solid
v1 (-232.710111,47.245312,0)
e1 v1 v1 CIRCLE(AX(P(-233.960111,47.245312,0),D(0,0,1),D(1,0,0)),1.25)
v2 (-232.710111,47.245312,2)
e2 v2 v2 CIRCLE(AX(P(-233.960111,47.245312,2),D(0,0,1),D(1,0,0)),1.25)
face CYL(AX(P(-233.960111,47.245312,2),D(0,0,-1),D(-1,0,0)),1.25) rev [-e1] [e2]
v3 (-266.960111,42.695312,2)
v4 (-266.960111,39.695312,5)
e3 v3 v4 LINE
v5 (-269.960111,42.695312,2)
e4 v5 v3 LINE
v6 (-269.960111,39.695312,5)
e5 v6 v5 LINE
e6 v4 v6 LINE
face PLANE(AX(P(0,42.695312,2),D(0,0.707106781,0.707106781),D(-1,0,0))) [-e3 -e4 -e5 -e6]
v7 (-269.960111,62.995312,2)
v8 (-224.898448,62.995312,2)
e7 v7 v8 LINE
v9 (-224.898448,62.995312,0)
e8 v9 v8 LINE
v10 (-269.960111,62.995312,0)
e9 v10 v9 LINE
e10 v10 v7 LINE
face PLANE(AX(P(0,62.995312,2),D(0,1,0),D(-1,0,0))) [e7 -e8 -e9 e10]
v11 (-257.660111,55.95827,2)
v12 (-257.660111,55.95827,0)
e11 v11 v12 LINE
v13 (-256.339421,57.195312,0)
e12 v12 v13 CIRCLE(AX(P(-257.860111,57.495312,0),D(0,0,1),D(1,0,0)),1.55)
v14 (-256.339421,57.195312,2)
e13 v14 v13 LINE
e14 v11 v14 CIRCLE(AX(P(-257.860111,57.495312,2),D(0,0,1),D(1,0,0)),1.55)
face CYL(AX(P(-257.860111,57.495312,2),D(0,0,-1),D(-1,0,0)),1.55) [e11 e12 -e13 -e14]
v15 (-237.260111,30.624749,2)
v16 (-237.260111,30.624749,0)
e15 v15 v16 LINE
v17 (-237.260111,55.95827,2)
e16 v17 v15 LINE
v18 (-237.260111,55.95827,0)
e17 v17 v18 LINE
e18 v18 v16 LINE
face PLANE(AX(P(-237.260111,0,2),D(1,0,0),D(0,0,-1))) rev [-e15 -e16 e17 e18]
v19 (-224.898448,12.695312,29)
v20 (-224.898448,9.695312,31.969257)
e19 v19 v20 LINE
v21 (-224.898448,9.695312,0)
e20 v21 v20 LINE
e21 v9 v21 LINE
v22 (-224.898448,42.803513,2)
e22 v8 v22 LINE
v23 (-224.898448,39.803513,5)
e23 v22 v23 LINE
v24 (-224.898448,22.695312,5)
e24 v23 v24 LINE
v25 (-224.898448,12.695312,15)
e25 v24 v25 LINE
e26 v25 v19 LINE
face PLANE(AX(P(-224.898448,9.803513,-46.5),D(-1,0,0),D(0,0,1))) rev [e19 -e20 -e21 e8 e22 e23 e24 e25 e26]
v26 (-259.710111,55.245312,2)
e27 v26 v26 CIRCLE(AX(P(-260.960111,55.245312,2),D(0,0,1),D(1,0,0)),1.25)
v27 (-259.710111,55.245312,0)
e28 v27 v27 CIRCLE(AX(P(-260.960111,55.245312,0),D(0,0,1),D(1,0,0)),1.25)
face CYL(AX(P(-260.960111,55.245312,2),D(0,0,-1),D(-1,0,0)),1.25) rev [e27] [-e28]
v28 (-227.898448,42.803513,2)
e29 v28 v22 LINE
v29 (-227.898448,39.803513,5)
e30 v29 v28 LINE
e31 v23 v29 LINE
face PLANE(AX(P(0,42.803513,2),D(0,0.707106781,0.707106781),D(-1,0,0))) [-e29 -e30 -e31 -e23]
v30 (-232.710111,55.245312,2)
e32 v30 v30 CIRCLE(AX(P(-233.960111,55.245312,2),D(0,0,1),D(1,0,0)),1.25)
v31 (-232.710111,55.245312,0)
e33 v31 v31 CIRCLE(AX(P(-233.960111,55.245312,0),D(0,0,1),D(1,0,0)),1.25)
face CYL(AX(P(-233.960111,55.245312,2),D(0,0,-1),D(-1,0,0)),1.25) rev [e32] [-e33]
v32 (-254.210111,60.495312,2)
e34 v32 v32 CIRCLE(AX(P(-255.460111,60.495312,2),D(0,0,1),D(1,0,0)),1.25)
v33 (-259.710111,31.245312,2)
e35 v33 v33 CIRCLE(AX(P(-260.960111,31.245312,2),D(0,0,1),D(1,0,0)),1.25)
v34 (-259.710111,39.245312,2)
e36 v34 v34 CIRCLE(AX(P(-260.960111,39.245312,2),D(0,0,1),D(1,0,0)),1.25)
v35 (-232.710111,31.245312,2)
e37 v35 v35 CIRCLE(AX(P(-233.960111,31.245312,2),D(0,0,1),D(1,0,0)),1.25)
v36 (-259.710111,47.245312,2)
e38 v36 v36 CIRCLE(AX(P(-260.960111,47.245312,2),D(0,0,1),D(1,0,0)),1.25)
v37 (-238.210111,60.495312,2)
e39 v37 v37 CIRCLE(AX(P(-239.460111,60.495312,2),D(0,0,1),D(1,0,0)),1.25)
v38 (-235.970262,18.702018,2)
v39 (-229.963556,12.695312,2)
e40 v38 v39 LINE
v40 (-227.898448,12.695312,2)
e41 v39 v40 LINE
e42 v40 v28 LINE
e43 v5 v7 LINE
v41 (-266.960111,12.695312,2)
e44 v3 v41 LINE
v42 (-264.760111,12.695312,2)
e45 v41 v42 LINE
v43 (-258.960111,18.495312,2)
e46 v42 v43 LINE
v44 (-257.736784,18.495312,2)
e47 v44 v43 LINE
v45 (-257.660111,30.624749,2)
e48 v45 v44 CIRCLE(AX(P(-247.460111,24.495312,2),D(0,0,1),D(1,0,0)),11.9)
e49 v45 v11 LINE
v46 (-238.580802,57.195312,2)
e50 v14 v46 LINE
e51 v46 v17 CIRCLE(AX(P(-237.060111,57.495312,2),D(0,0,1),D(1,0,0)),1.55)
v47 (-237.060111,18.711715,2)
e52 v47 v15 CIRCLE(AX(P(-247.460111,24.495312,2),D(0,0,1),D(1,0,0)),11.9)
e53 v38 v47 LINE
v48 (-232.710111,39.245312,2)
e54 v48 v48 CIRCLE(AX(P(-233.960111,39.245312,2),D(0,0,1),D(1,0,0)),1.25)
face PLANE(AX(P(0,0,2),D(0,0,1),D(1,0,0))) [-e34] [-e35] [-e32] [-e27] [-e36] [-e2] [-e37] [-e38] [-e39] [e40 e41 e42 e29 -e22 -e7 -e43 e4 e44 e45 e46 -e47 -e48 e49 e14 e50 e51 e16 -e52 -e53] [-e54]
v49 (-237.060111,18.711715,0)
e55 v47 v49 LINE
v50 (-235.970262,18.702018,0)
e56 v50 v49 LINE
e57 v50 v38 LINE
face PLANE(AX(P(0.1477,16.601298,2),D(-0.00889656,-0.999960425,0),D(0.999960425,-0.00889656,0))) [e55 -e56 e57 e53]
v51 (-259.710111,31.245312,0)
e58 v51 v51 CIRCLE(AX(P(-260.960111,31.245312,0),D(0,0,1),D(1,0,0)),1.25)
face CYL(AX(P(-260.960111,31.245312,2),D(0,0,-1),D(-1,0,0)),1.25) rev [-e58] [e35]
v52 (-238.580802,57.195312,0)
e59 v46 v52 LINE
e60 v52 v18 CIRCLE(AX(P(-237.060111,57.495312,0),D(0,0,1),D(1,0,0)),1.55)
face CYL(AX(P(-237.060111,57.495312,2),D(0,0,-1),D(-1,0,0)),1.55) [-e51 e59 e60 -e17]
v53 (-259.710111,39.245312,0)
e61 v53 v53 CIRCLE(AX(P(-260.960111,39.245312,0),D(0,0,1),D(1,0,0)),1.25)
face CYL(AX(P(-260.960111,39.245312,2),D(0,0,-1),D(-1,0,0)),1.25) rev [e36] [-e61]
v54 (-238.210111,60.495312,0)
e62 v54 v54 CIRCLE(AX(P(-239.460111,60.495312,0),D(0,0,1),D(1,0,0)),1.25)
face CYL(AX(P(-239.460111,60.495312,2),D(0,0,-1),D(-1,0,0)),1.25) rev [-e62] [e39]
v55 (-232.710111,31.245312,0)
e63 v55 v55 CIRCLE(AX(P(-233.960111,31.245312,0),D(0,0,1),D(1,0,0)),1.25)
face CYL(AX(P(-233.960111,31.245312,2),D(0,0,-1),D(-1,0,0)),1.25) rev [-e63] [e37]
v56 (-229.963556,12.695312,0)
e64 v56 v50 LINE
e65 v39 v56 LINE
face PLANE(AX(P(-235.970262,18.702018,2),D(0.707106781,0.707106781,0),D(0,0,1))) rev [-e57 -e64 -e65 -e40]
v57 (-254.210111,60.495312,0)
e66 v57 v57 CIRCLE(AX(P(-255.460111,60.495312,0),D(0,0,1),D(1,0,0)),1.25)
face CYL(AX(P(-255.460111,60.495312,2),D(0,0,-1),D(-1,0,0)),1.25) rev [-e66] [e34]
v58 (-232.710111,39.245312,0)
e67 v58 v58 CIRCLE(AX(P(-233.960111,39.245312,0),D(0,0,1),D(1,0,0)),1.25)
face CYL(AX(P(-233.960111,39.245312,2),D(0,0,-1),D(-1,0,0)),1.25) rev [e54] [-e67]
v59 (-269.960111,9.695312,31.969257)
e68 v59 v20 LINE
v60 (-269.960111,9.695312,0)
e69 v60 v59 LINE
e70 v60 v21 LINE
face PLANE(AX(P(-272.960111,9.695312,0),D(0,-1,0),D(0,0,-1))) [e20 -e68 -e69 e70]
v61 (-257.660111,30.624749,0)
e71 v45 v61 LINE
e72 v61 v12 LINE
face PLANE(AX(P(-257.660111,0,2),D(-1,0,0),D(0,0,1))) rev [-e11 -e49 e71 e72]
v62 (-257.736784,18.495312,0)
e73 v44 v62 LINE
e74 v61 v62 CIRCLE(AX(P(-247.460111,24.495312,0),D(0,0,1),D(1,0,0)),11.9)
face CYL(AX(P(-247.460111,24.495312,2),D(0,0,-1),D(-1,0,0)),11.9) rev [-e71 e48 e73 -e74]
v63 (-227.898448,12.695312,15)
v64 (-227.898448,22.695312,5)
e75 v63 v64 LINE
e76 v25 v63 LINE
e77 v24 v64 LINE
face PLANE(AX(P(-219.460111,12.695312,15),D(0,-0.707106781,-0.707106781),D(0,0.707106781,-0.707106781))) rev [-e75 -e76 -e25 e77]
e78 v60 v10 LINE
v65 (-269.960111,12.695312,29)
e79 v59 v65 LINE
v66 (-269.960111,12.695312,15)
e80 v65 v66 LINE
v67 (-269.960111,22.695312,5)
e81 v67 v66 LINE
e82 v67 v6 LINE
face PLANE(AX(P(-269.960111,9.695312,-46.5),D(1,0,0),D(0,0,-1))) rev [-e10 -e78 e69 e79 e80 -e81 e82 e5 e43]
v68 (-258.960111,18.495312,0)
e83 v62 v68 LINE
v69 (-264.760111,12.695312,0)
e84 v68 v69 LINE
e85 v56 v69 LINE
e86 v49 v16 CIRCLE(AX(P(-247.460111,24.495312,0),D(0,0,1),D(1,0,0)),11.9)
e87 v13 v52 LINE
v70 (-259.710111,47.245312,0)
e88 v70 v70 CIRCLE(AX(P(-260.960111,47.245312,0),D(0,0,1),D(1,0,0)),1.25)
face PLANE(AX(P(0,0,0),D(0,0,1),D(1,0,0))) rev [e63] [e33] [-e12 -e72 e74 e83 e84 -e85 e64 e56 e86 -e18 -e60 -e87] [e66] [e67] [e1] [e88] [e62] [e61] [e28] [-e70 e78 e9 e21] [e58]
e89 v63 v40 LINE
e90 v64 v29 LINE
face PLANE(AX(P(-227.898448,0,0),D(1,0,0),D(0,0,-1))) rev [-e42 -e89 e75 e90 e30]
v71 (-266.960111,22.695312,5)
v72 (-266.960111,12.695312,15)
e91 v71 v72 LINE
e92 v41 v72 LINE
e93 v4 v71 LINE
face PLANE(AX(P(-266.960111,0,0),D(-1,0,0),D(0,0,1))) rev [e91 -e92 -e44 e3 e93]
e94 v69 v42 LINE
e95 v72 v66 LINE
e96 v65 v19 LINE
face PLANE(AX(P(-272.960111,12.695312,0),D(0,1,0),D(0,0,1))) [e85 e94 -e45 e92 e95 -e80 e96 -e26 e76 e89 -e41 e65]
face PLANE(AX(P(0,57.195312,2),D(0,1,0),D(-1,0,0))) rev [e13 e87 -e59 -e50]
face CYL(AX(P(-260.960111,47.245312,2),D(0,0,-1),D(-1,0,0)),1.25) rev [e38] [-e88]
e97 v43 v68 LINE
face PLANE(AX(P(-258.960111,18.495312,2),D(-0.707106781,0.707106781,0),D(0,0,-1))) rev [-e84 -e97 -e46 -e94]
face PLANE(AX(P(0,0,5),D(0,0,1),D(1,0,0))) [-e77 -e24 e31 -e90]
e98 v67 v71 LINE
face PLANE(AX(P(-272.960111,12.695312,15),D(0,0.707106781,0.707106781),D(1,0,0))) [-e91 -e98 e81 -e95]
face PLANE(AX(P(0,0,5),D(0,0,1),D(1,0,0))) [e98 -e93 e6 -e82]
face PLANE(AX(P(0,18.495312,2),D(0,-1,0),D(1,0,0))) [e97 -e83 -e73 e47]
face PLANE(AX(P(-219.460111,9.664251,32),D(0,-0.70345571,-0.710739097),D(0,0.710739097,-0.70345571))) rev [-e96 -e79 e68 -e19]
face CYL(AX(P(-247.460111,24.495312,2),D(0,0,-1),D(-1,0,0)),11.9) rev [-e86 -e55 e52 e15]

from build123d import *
from OCP.BRepFilletAPI import BRepFilletAPI_MakeChamfer
from build123d.topology import SkipClean

# Parameters (mm, degrees)
SZKIC2_R                         = 1.25
DODANIE_WYCI_GNI_CIE2_DEPTH      = 2
DODANIE_WYCI_GNI_CIE3_DEPTH      = 3
DODANIE_WYCI_GNI_CIE3_DEPTH_BACK = 2
SZKIC3_W                         = 6
SZKIC3_H                         = 30
DODANIE_WYCI_GNI_CIE4_DEPTH      = 30
DODANIE_WYCI_GNI_CIE4_DEPTH_BACK = 2
SZKIC4_W                         = 6
SZKIC4_H                         = 3
SFAZOWANIE1_SIZE                 = 8
SFAZOWANIE1_SIZE2                = 7.929766182
SFAZOWANIE1_SIZE2_2              = 8.072133677
SFAZOWANIE2_SIZE                 = 10
SFAZOWANIE3_SIZE                 = 3
SZKIC5_W                         = 38.5
SZKIC5_H                         = 53.3
SZKIC5_W_2                       = 38.438336307
SZKIC5_H_2                       = 53.191798748
WYTNIJ_WYCI_GNI_CIE1_DEPTH       = 48.5
DODANIE_WYCI_GNI_CIE5_DEPTH      = 42.061663693
WYTNIJ_WYCI_GNI_CIE2_DEPTH       = 50.5


with BuildPart() as part:
    # Szkic2 → Dodanie-wyciągnięcie2 (new body)
    with BuildSketch(Plane.XY):
        with BuildLine():
            Line((-191.460111356, 62.995312244), (-303.460111356, 62.995312244))
            Line((-303.460111356, 62.995312244), (-308.460111356, 57.995312244))
            Line((-308.460111356, 57.995312244), (-308.460111356, 23.495312244))
            Line((-308.460111356, 23.495312244), (-303.460111356, 18.495312244))
            Line((-303.460111356, 18.495312244), (-302.736783969, 18.495312244))
            ThreePointArc((-302.736783969, 18.495312244), (-304.359873615, 24.570533036), (-302.660111356, 30.624749412))
            Line((-302.660111356, 30.624749412), (-302.660111356, 55.958269629))
            ThreePointArc((-302.660111356, 55.958269629), (-301.800506396, 56.364057485), (-301.339420723, 57.195312244))
            Line((-301.339420723, 57.195312244), (-283.580801989, 57.195312244))
            ThreePointArc((-283.580801989, 57.195312244), (-283.119716316, 56.364057485), (-282.260111356, 55.958269629))
            Line((-282.260111356, 55.958269629), (-282.260111356, 30.624749412))
            ThreePointArc((-282.260111356, 30.624749412), (-280.560349096, 24.570533036), (-282.183438743, 18.495312244))
            Line((-282.183438743, 18.495312244), (-257.736783969, 18.495312244))
            ThreePointArc((-257.736783969, 18.495312244), (-259.359873615, 24.570533036), (-257.660111356, 30.624749412))
            Line((-257.660111356, 30.624749412), (-257.660111356, 55.958269629))
            ThreePointArc((-257.660111356, 55.958269629), (-256.800506396, 56.364057485), (-256.339420723, 57.195312244))
            Line((-256.339420723, 57.195312244), (-238.580801989, 57.195312244))
            ThreePointArc((-238.580801989, 57.195312244), (-238.119716316, 56.364057485), (-237.260111356, 55.958269629))
            Line((-237.260111356, 55.958269629), (-237.260111356, 30.624749412))
            ThreePointArc((-237.260111356, 30.624749412), (-235.561787998, 24.695065265), (-237.060111356, 18.711714747))
            Line((-237.060111356, 18.711714747), (-212.736783969, 18.495312244))
            ThreePointArc((-212.736783969, 18.495312244), (-214.359873615, 24.570533036), (-212.660111356, 30.624749412))
            Line((-212.660111356, 30.624749412), (-212.660111356, 55.958269629))
            ThreePointArc((-212.660111356, 55.958269629), (-211.800506396, 56.364057485), (-211.339420723, 57.195312244))
            Line((-211.339420723, 57.195312244), (-193.580801989, 57.195312244))
            ThreePointArc((-193.580801989, 57.195312244), (-193.119716316, 56.364057485), (-192.260111356, 55.958269629))
            Line((-192.260111356, 55.958269629), (-192.260111356, 30.624749412))
            ThreePointArc((-192.260111356, 30.624749412), (-190.560349096, 24.570533036), (-192.183438743, 18.495312244))
            Line((-192.183438743, 18.495312244), (-191.460111356, 18.495312244))
            Line((-191.460111356, 18.495312244), (-186.460111356, 23.495312244))
            Line((-186.460111356, 23.495312244), (-186.460111356, 57.995312244))
            Line((-186.460111356, 57.995312244), (-191.460111356, 62.995312244))
        make_face()
        with Locations((-305.960111356, 31.245312244)):
            Circle(SZKIC2_R, mode=Mode.SUBTRACT)
        with Locations((-278.960111356, 31.245312244)):
            Circle(SZKIC2_R, mode=Mode.SUBTRACT)
        with Locations((-305.960111356, 39.245312244)):
            Circle(SZKIC2_R, mode=Mode.SUBTRACT)
        with Locations((-278.960111356, 39.245312244)):
            Circle(SZKIC2_R, mode=Mode.SUBTRACT)
        with Locations((-260.960111356, 31.245312244)):
            Circle(SZKIC2_R, mode=Mode.SUBTRACT)
        with Locations((-260.960111356, 39.245312244)):
            Circle(SZKIC2_R, mode=Mode.SUBTRACT)
        with Locations((-233.960111356, 31.245312244)):
            Circle(SZKIC2_R, mode=Mode.SUBTRACT)
        with Locations((-233.960111356, 39.245312244)):
            Circle(SZKIC2_R, mode=Mode.SUBTRACT)
        with Locations((-215.960111356, 31.245312244)):
            Circle(SZKIC2_R, mode=Mode.SUBTRACT)
        with Locations((-188.960111356, 31.245312244)):
            Circle(SZKIC2_R, mode=Mode.SUBTRACT)
        with Locations((-215.960111356, 39.245312244)):
            Circle(SZKIC2_R, mode=Mode.SUBTRACT)
        with Locations((-188.960111356, 39.245312244)):
            Circle(SZKIC2_R, mode=Mode.SUBTRACT)
        with Locations((-305.960111356, 47.245312244)):
            Circle(SZKIC2_R, mode=Mode.SUBTRACT)
        with Locations((-278.960111356, 47.245312244)):
            Circle(SZKIC2_R, mode=Mode.SUBTRACT)
        with Locations((-260.960111356, 47.245312244)):
            Circle(SZKIC2_R, mode=Mode.SUBTRACT)
        with Locations((-305.960111356, 55.245312244)):
            Circle(SZKIC2_R, mode=Mode.SUBTRACT)
        with Locations((-278.960111356, 55.245312244)):
            Circle(SZKIC2_R, mode=Mode.SUBTRACT)
        with Locations((-300.460111356, 60.495312244)):
            Circle(SZKIC2_R, mode=Mode.SUBTRACT)
        with Locations((-284.460111356, 60.495312244)):
            Circle(SZKIC2_R, mode=Mode.SUBTRACT)
        with Locations((-260.960111356, 55.245312244)):
            Circle(SZKIC2_R, mode=Mode.SUBTRACT)
        with Locations((-255.460111356, 60.495312244)):
            Circle(SZKIC2_R, mode=Mode.SUBTRACT)
        with Locations((-233.960111356, 47.245312244)):
            Circle(SZKIC2_R, mode=Mode.SUBTRACT)
        with Locations((-215.960111356, 47.245312244)):
            Circle(SZKIC2_R, mode=Mode.SUBTRACT)
        with Locations((-188.960111356, 47.245312244)):
            Circle(SZKIC2_R, mode=Mode.SUBTRACT)
        with Locations((-233.960111356, 55.245312244)):
            Circle(SZKIC2_R, mode=Mode.SUBTRACT)
        with Locations((-239.460111356, 60.495312244)):
            Circle(SZKIC2_R, mode=Mode.SUBTRACT)
        with Locations((-215.960111356, 55.245312244)):
            Circle(SZKIC2_R, mode=Mode.SUBTRACT)
        with Locations((-188.960111356, 55.245312244)):
            Circle(SZKIC2_R, mode=Mode.SUBTRACT)
        with Locations((-210.460111356, 60.495312244)):
            Circle(SZKIC2_R, mode=Mode.SUBTRACT)
        with Locations((-194.460111356, 60.495312244)):
            Circle(SZKIC2_R, mode=Mode.SUBTRACT)
    extrude(amount=DODANIE_WYCI_GNI_CIE2_DEPTH)

    # Szkic3 → Dodanie-wyciągnięcie3 (add, two sides: drawn at the far end of the back side and taken through both)
    with BuildSketch(Plane.XY.offset(2).offset(-DODANIE_WYCI_GNI_CIE3_DEPTH_BACK)):
        with Locations((-269.960111356, 27.695312244)):
            Rectangle(SZKIC3_W, SZKIC3_H)
        with Locations((-224.898447663, 27.803513496)):
            Rectangle(SZKIC3_W, SZKIC3_H)
    extrude(amount=DODANIE_WYCI_GNI_CIE3_DEPTH + DODANIE_WYCI_GNI_CIE3_DEPTH_BACK)

    # Szkic4 → Dodanie-wyciągnięcie4 (add, two sides: drawn at the far end of the back side and taken through both)
    with BuildSketch(Plane.XY.offset(2).offset(-DODANIE_WYCI_GNI_CIE4_DEPTH_BACK)):
        with Locations((-269.960111356, 11.195312244)):
            Rectangle(SZKIC4_W, SZKIC4_H)
        with Locations((-224.898447663, 11.303513496)):
            Rectangle(SZKIC4_W, SZKIC4_H)
    extrude(amount=DODANIE_WYCI_GNI_CIE4_DEPTH + DODANIE_WYCI_GNI_CIE4_DEPTH_BACK)

    # Sfazowanie1: one chamfer whose edges measure the first distance from different faces: ONE call of the kernel's chamfer builder (chamfer() names one face for all edges)
    sfazowanie1_edges_1 = [part.edges().sort_by_distance(p)[0] for p in [
        (-266.960111356, 18.495312244, 1),
        (-272.960111356, 18.495312244, 1),
    ]]
    sfazowanie1_edges_2 = [part.edges().sort_by_distance(p)[0] for p in [
        (-221.898447663, 18.57682276, 1),
    ]]
    sfazowanie1_side_2 = [part.faces().sort_by_distance(p)[0] for p in [
        (-221.898447663, 14.190168128, 0.459673797),
    ]]
    sfazowanie1_edges_3 = [part.edges().sort_by_distance(p)[0] for p in [
        (-227.898447663, 18.630204232, 1),
    ]]
    sfazowanie1_side_3 = [part.faces().sort_by_distance(p)[0] for p in [
        (-227.898447663, 42.343839698, 3.5),
    ]]
    sfazowanie1 = BRepFilletAPI_MakeChamfer(part.part.solid().wrapped)
    for e in sfazowanie1_edges_1:
        sfazowanie1.Add(SFAZOWANIE1_SIZE, e.wrapped)
    for e in sfazowanie1_edges_2:
        sfazowanie1.Add(SFAZOWANIE1_SIZE, SFAZOWANIE1_SIZE2, e.wrapped, sfazowanie1_side_2[0].wrapped)  # the first distance lies on this face
    for e in sfazowanie1_edges_3:
        sfazowanie1.Add(SFAZOWANIE1_SIZE, SFAZOWANIE1_SIZE2_2, e.wrapped, sfazowanie1_side_3[0].wrapped)  # the first distance lies on this face
    add(Compound.cast(sfazowanie1.Shape()), mode=Mode.REPLACE)

    # Sfazowanie2
    sfazowanie2_edges = [part.edges().sort_by_distance(p)[0] for p in [
        (-269.960111356, 12.695312244, 5),
        (-224.898447663, 12.803513496, 5),
    ]]
    chamfer(sfazowanie2_edges, length=SFAZOWANIE2_SIZE)

    # Sfazowanie3
    sfazowanie3_edges = [part.edges().sort_by_distance(p)[0] for p in [
        (-224.898447663, 12.803513496, 32),
        (-269.960111356, 12.695312244, 32),
        (-224.898447663, 42.803513496, 5),
        (-269.960111356, 42.695312244, 5),
    ]]
    chamfer(sfazowanie3_edges, length=SFAZOWANIE3_SIZE - 0.0001)  # a hair under: the kernel refuses the full size

    # Szkic5 → Wytnij-wyciągnięcie1 (cut, symmetric)
    with BuildSketch(Plane.XY.offset(2)):
        with Locations((-289.210111356, 36.345312244)):
            Rectangle(SZKIC5_W, SZKIC5_H)
        with Locations((-205.67927951, 36.39941287)):
            Rectangle(SZKIC5_W_2, SZKIC5_H_2)
    extrude(amount=WYTNIJ_WYCI_GNI_CIE1_DEPTH, both=True, mode=Mode.SUBTRACT)

    # Szkic6 → Dodanie-wyciągnięcie5 (add)
    with SkipClean():  # the faces are left unmerged after this step: merging them gives an invalid solid
        with BuildSketch(Plane(origin=(-266.960111356, 0, 0), x_dir=(0, 0, -1), z_dir=(1, 0, 0))):
            Polygon((-32, 9.695312244), (-29, 12.695312244), (0, 12.695312244), (0, 9.695312244), align=None)
        extrude(amount=DODANIE_WYCI_GNI_CIE5_DEPTH)

    # Szkic7 → Wytnij-wyciągnięcie2 (cut, symmetric)
    with BuildSketch(Plane.ZY.offset(269.960111356)):
        Polygon((5, 22.695312244), (5, 31.42772167), (32, 31.42772167), (32, 9.664251066), (29, 12.695312244), (15, 12.695312244), align=None)
    extrude(amount=WYTNIJ_WYCI_GNI_CIE2_DEPTH, both=True, mode=Mode.SUBTRACT)


solid = part.part
